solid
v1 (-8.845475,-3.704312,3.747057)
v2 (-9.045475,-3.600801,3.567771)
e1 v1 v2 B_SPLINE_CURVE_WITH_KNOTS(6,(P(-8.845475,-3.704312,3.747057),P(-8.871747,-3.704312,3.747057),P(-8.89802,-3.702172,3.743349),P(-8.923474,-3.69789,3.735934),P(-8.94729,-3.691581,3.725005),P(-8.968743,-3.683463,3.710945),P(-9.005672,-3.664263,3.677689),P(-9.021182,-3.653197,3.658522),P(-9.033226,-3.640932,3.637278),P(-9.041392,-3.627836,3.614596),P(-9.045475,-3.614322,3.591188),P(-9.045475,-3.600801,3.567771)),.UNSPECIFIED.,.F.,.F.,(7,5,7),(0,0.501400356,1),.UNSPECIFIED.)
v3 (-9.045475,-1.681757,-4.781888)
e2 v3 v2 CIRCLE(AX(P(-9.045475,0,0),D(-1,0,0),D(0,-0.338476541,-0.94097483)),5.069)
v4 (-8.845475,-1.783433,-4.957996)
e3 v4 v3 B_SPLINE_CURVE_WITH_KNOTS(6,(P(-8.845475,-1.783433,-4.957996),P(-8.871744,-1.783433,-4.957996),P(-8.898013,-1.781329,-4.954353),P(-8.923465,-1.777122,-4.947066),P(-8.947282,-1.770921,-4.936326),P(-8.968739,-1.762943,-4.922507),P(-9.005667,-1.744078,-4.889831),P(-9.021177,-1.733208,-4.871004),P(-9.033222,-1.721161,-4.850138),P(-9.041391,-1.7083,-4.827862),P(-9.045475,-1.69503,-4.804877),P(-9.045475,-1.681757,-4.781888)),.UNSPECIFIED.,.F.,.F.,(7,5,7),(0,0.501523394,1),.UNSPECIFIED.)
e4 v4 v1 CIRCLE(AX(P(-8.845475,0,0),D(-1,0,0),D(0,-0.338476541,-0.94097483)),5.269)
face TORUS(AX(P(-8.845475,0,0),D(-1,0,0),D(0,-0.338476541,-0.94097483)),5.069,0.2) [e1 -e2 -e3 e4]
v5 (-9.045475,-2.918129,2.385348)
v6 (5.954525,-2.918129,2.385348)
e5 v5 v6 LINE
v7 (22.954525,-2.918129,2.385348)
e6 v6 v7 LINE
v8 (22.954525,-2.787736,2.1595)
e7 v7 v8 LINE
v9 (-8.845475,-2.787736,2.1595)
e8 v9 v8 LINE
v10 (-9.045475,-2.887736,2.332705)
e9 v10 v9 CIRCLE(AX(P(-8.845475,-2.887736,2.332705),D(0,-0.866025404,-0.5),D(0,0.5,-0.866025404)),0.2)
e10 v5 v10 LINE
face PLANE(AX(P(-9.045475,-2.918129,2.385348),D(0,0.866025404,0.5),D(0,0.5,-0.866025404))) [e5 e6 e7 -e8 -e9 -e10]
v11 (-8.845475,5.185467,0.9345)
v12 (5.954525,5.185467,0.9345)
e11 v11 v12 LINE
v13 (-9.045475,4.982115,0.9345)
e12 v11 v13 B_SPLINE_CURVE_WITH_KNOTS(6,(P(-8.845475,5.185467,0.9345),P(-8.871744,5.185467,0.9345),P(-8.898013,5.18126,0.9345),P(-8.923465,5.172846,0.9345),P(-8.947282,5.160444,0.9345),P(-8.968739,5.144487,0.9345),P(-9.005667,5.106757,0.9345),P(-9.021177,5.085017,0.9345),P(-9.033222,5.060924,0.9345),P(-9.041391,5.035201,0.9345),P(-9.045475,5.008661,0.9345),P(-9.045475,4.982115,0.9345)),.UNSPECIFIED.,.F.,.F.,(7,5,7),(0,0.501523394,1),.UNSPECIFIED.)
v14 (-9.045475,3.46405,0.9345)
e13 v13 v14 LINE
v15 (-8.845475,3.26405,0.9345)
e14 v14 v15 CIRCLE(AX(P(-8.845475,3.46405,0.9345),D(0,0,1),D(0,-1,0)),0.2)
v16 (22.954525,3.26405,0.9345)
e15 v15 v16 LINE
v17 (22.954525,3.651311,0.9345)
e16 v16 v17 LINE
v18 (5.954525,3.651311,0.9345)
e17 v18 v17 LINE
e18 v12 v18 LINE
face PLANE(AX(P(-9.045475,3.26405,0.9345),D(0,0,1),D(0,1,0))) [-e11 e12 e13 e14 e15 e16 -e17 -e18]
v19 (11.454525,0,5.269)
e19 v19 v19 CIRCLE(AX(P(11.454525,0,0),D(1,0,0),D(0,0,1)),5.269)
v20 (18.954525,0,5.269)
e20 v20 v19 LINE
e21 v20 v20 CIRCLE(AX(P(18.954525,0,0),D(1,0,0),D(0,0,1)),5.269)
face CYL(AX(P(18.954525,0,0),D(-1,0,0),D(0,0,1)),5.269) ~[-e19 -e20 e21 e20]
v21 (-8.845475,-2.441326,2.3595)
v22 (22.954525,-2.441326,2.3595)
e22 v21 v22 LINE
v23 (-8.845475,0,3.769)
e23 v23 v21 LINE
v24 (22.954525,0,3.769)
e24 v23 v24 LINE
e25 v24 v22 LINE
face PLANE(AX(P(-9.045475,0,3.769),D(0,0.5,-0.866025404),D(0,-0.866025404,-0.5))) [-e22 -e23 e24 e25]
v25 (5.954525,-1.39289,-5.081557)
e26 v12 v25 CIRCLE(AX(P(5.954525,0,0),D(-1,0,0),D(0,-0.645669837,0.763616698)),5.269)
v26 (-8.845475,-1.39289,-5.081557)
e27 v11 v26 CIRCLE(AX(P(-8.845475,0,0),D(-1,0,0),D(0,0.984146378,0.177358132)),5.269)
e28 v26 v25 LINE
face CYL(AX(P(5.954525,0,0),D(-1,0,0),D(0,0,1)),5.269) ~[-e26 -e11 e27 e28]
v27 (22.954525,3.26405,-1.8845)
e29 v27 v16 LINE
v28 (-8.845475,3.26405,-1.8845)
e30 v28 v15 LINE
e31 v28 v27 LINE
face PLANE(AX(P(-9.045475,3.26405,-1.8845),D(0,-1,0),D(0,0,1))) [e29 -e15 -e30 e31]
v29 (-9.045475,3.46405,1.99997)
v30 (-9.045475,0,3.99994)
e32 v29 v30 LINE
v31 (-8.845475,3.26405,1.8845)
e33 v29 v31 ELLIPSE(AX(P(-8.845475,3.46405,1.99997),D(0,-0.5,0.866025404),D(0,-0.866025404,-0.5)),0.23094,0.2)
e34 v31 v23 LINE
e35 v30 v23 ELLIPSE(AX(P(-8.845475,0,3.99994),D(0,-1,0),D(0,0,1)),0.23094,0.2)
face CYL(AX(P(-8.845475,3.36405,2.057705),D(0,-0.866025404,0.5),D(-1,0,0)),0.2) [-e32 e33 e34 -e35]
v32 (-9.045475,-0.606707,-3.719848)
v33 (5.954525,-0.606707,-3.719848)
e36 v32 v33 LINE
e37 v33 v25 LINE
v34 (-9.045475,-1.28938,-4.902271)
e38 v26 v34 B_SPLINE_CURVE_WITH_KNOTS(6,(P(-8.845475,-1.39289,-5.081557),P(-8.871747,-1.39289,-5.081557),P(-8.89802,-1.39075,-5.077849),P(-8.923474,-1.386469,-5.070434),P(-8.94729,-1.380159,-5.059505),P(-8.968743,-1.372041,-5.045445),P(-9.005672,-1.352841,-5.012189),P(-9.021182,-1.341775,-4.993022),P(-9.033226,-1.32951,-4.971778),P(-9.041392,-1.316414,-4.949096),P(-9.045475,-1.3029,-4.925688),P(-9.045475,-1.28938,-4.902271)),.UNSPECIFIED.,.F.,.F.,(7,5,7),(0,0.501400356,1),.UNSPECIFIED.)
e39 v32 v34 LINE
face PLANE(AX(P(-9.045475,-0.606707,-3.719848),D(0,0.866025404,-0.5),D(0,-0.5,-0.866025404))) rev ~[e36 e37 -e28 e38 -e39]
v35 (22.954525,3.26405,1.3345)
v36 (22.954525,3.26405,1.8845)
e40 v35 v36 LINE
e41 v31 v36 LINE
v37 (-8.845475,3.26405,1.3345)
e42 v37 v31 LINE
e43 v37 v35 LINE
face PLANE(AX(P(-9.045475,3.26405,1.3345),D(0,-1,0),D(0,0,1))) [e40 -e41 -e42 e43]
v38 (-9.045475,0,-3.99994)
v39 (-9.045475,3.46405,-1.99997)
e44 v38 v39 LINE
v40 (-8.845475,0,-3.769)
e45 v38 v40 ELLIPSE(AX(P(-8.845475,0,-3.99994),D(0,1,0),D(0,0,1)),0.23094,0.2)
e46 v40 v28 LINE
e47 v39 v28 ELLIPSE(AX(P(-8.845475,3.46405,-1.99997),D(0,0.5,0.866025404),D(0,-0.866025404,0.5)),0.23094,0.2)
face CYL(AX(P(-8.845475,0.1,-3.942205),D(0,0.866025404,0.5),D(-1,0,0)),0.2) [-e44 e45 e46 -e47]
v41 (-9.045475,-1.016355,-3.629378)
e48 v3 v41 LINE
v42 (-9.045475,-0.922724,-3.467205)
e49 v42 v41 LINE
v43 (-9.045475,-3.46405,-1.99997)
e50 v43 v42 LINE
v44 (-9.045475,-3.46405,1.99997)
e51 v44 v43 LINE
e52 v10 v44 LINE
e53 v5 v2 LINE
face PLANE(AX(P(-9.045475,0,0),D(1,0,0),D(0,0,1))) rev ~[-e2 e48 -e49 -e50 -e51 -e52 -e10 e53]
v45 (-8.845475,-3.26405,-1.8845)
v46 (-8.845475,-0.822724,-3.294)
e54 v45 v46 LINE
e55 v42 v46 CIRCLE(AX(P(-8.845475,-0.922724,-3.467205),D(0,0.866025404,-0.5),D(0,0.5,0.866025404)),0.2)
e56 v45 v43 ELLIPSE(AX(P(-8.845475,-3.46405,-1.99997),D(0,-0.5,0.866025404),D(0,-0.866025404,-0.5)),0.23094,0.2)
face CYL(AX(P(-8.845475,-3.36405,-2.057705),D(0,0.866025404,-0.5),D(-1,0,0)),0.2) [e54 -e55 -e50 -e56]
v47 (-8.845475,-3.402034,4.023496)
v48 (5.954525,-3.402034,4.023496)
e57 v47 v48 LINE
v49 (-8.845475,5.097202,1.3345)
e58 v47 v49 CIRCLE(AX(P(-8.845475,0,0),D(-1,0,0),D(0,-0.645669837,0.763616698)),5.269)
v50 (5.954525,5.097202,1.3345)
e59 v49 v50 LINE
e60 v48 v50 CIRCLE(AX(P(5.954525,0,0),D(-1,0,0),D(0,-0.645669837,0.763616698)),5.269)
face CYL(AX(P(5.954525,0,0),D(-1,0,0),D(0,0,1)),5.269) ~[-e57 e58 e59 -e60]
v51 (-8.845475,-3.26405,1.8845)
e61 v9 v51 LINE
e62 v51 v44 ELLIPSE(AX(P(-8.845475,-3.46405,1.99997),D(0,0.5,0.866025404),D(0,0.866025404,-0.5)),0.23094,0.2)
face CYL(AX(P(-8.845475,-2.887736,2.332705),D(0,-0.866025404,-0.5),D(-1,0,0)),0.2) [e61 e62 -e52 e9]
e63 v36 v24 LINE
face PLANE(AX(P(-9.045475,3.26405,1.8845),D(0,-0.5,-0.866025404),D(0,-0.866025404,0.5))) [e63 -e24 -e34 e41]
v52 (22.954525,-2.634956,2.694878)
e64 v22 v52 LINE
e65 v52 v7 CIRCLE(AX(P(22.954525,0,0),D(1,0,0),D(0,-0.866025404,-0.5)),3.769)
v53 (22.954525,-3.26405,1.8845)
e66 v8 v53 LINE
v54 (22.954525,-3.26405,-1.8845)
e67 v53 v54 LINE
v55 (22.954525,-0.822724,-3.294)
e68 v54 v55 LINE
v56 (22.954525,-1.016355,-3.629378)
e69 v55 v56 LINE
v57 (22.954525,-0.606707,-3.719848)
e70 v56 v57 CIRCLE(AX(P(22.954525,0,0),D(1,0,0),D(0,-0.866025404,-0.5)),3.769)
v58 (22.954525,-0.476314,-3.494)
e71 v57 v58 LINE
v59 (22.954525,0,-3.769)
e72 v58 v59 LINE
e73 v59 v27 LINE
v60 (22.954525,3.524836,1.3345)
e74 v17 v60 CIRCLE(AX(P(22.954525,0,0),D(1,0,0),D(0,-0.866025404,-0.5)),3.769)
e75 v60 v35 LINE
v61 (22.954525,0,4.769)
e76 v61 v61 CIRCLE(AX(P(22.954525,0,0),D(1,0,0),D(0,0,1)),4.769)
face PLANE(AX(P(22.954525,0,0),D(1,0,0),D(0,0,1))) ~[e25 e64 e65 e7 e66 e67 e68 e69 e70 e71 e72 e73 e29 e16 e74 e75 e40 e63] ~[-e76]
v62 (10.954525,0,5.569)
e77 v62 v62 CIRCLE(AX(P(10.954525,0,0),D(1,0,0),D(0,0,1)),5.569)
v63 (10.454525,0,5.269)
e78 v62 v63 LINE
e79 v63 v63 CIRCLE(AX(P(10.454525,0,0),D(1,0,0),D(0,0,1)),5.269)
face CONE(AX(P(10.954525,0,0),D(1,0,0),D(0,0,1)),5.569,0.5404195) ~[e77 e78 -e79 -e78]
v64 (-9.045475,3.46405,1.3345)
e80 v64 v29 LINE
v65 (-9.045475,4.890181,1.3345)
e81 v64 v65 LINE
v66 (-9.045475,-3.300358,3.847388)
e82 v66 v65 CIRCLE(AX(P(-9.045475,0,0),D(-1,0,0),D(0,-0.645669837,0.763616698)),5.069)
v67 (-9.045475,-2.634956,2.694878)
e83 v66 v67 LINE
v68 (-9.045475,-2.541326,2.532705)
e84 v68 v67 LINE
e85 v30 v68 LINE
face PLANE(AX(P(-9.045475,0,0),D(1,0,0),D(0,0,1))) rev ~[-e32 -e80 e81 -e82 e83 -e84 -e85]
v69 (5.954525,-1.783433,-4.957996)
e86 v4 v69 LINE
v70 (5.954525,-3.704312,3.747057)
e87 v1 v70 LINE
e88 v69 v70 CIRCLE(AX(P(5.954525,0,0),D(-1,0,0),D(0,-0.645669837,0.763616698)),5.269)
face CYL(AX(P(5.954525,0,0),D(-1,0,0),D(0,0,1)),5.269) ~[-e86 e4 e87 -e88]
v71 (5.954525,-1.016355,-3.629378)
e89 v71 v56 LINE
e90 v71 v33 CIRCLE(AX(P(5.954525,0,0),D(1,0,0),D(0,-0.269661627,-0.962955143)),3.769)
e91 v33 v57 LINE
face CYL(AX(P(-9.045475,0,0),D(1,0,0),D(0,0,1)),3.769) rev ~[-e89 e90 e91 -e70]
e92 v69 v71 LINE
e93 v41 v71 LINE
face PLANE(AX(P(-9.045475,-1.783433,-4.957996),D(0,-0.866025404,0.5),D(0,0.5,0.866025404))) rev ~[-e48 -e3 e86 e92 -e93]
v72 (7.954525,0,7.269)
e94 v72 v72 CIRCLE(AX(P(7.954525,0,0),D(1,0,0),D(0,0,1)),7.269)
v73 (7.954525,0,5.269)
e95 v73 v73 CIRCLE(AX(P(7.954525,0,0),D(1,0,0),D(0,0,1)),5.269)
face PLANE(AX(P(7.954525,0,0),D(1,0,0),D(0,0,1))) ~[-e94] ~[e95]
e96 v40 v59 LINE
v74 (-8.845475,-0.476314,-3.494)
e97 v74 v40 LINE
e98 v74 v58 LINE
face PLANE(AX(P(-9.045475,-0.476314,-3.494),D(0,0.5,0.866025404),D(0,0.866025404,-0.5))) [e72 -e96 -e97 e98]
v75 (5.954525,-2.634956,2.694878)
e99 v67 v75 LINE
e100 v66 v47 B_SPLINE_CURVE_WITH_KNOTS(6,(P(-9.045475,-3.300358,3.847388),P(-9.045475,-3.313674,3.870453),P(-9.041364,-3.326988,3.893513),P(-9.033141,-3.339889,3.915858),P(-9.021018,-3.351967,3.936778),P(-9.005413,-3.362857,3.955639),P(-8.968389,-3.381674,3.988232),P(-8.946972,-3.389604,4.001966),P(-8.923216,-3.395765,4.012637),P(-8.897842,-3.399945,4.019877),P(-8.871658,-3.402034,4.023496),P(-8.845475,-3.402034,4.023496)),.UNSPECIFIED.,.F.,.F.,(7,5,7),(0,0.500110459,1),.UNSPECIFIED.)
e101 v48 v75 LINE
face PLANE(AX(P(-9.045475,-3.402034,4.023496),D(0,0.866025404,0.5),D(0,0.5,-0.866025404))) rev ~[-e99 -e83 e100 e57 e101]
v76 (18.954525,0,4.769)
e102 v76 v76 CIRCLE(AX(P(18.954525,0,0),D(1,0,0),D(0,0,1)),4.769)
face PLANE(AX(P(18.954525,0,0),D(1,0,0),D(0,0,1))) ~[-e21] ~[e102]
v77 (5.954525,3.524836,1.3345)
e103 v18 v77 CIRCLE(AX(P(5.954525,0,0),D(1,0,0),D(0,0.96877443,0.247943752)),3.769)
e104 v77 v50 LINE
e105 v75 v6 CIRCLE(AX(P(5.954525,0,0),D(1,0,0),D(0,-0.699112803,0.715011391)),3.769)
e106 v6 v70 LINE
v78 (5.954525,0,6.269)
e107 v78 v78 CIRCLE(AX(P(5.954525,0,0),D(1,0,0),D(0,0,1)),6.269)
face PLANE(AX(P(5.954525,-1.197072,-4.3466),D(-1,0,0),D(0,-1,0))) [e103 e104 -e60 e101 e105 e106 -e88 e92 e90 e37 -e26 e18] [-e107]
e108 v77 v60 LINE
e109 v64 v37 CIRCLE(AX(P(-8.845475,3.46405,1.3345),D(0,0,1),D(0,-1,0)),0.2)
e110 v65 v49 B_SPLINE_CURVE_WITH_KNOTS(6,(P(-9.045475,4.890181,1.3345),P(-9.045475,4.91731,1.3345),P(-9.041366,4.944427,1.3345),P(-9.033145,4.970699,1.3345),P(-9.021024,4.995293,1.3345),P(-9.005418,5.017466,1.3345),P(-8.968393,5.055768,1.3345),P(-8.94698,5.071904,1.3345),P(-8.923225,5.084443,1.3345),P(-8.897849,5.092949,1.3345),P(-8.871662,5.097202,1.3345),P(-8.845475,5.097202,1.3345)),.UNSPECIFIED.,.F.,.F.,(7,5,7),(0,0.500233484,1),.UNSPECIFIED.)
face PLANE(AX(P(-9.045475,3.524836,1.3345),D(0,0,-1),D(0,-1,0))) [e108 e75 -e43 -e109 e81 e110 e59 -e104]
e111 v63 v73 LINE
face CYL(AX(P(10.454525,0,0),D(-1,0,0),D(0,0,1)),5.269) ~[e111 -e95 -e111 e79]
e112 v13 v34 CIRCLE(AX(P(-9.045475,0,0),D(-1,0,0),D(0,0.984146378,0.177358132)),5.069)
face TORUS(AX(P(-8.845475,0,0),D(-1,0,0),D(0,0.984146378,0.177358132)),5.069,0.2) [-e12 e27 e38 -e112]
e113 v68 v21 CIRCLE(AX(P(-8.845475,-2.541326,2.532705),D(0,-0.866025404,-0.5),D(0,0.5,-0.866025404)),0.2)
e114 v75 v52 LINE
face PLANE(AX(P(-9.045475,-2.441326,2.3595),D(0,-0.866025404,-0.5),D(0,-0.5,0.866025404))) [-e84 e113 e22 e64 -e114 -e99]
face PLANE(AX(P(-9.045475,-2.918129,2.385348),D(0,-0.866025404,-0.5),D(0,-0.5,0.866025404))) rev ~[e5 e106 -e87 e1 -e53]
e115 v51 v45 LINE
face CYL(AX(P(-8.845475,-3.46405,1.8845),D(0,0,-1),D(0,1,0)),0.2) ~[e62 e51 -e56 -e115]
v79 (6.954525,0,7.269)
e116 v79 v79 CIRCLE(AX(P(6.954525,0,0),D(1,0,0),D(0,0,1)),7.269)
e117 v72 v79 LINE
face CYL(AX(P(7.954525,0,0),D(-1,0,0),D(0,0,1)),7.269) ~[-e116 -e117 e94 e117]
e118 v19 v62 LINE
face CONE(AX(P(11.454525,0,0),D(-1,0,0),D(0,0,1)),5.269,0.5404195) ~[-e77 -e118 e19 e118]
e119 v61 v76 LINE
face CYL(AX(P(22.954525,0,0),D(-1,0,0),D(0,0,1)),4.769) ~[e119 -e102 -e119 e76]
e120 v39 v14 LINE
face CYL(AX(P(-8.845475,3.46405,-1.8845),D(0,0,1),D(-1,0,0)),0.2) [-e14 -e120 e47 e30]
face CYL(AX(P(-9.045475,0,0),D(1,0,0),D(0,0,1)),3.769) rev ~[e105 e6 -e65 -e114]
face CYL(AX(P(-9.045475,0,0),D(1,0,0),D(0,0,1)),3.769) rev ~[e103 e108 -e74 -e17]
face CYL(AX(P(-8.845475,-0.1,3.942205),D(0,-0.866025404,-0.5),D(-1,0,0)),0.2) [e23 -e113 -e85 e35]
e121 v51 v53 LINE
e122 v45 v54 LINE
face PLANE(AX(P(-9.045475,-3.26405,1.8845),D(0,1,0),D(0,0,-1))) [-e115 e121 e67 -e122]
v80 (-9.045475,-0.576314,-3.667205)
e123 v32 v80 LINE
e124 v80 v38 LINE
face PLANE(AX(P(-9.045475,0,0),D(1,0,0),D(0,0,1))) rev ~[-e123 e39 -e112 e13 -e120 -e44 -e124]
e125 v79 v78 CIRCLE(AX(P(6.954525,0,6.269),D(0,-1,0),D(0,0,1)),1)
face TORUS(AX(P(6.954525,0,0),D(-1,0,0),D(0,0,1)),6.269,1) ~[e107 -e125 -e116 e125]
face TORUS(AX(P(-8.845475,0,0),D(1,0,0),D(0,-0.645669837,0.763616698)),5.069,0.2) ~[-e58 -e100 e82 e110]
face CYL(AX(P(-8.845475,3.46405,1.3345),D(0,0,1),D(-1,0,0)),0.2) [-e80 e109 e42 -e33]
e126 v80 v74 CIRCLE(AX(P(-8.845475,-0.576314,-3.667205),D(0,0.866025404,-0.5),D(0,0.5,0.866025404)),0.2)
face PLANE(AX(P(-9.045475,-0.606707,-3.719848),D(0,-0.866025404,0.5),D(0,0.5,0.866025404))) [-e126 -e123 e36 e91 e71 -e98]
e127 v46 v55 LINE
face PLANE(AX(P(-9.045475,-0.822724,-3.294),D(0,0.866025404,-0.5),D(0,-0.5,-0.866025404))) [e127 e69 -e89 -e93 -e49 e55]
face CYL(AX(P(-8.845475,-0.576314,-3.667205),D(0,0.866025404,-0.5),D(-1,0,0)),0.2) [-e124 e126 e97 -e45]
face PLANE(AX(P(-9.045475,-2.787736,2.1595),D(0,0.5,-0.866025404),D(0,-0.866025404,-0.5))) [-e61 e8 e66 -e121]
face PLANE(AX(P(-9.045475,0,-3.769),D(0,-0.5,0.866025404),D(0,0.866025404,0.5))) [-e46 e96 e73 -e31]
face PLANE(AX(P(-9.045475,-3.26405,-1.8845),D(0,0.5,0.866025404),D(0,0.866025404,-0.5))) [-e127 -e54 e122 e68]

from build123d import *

# Parameters (mm, degrees)
F2_R     = 1
F4_DEPTH = 32
F5_DEPTH = 32
F6_DEPTH = 15
F7_DEPTH = 15
F8_DEPTH = 15
F9_R     = 0.2


with BuildPart() as f1:
    # F0 (on Front) → F1 (revolve)
    with BuildSketch(Plane.XZ):
        Polygon((-9.0454753935, 5.269), (-9.0454753935, 3.769), (22.9545246065, 3.769), (22.9545246065, 4.769), (18.9545246065, 4.769), (18.9545246065, 5.269), (11.4545246065, 5.269), (10.9545246065, 5.569), (10.4545246065, 5.269), (7.9545246065, 5.269), (7.9545246065, 7.269), (5.9545246065, 7.269), (5.9545246065, 5.269), align=None)
    revolve(axis=Axis((2.1683473801, 0, 0), (1, 0, 0)))

    # F2
    f2_edges = [f1.edges().sort_by_distance(p)[0] for p in [
        (5.954525, 0, -7.269),
    ]]
    fillet(f2_edges, radius=F2_R)

    # F3 (on face) → F4 (join)
    with BuildSketch(Plane(origin=(-9.0454753935, 0, 0), x_dir=(0, -1, 0), z_dir=(-1, 0, 0))):
        with BuildLine():
            ThreePointArc((3.769, 0), (3.6405744393, 0.975488981), (3.2640497469, 1.8845))
            Line((3.2640497469, 1.8845), (3.2640497469, -1.8845))
            ThreePointArc((3.2640497469, -1.8845), (3.6405744393, -0.975488981), (3.769, 0))
        make_face()
    extrude(amount=-F4_DEPTH)

    # F3 (on face) → F5 (join)
    with BuildSketch(Plane(origin=(-9.0454753935, 0, 0), x_dir=(0, -1, 0), z_dir=(-1, 0, 0))):
        with BuildLine():
            ThreePointArc((3.769, 0), (3.6405744393, 0.975488981), (3.2640497469, 1.8845))
            Line((3.2640497469, 1.8845), (3.2640497469, -1.8845))
            ThreePointArc((3.2640497469, -1.8845), (3.6405744393, -0.975488981), (3.769, 0))
        make_face()
        with BuildLine():
            Line((2.7877357748, 2.1595), (3.2640497469, 1.8845))
            ThreePointArc((3.2640497469, 1.8845), (3.1012168176, 2.1419185909), (2.9181290377, 2.3853477564))
            Line((2.9181290377, 2.3853477564), (2.7877357748, 2.1595))
        make_face()
        with BuildLine():
            ThreePointArc((1.0163546733, -3.6293779327), (2.3111934688, -2.9772043514), (3.2640497469, -1.8845))
            Line((3.2640497469, -1.8845), (0.8227241336, -3.294))
            Line((0.8227241336, -3.294), (1.0163546733, -3.6293779327))
        make_face()
        with BuildLine():
            Line((0, 3.769), (2.4413256133, 2.3595))
            Line((2.4413256133, 2.3595), (2.634956153, 2.6948779327))
            ThreePointArc((2.634956153, 2.6948779327), (1.4227378662, 3.4901544327), (0, 3.769))
        make_face()
        with BuildLine():
            Line((0.606707235, -3.7198477564), (0.4763139721, -3.494))
            Line((0.4763139721, -3.494), (0, -3.769))
            ThreePointArc((0, -3.769), (0.3043475037, -3.7566918422), (0.606707235, -3.7198477564))
        make_face()
        with BuildLine():
            Line((-3.2640497469, 1.8845), (0, 3.769))
            ThreePointArc((0, 3.769), (-1.8845, 3.2640497469), (-3.2640497469, 1.8845))
        make_face()
        with BuildLine():
            ThreePointArc((-3.2640497469, -1.8845), (-1.8845, -3.2640497469), (0, -3.769))
            Line((0, -3.769), (-3.2640497469, -1.8845))
        make_face()
        with BuildLine():
            Line((-3.2640497469, 1.3345), (-3.2640497469, 1.8845))
            ThreePointArc((-3.2640497469, 1.8845), (-3.4055643214, 1.6147732513), (-3.5248362728, 1.3345))
            Line((-3.5248362728, 1.3345), (-3.2640497469, 1.3345))
        make_face()
        with BuildLine():
            ThreePointArc((-3.6513108263, 0.9345), (-3.7339313349, -0.5129500813), (-3.2640497469, -1.8845))
            Line((-3.2640497469, -1.8845), (-3.2640497469, 0.9345))
            Line((-3.2640497469, 0.9345), (-3.6513108263, 0.9345))
        make_face()
    extrude(amount=-F5_DEPTH)

    # F3 (on face) → F6 (cut)
    with BuildSketch(Plane(origin=(-9.0454753935, 0, 0), x_dir=(0, -1, 0), z_dir=(-1, 0, 0))):
        with BuildLine():
            ThreePointArc((2.634956153, 2.6948779327), (2.78085257, 2.5440558138), (2.9181290377, 2.3853477564))
            Line((2.9181290377, 2.3853477564), (3.704312025, 3.7470566344))
            ThreePointArc((3.704312025, 3.7470566344), (3.5558605867, 3.8882150774), (3.402034372, 4.0234963814))
            Line((3.402034372, 4.0234963814), (2.634956153, 2.6948779327))
        make_face()
    extrude(amount=-F6_DEPTH, mode=Mode.SUBTRACT)

    # F3 (on face) → F7 (cut)
    with BuildSketch(Plane(origin=(-9.0454753935, 0, 0), x_dir=(0, -1, 0), z_dir=(-1, 0, 0))):
        with BuildLine():
            Line((1.7834328924, -4.9579963814), (1.0163546733, -3.6293779327))
            ThreePointArc((1.0163546733, -3.6293779327), (0.8127906784, -3.6803168767), (0.606707235, -3.7198477564))
            Line((0.606707235, -3.7198477564), (1.3928902223, -5.0815566344))
            ThreePointArc((1.3928902223, -5.0815566344), (1.589362739, -5.0235731391), (1.7834328924, -4.9579963814))
        make_face()
    extrude(amount=-F7_DEPTH, mode=Mode.SUBTRACT)

    # F3 (on face) → F8 (cut)
    with BuildSketch(Plane(origin=(-9.0454753935, 0, 0), x_dir=(0, -1, 0), z_dir=(-1, 0, 0))):
        with BuildLine():
            Line((-3.5248362728, 1.3345), (-5.0972022473, 1.3345))
            ThreePointArc((-5.0972022473, 1.3345), (-5.1452233257, 1.1353580617), (-5.1854672644, 0.9345))
            Line((-5.1854672644, 0.9345), (-3.6513108263, 0.9345))
            ThreePointArc((-3.6513108263, 0.9345), (-3.5936432484, 1.1362610629), (-3.5248362728, 1.3345))
        make_face()
    extrude(amount=-F8_DEPTH, mode=Mode.SUBTRACT)

    # F9
    f9_edges = [f1.edges().sort_by_distance(p)[0] for p in [
        (-9.045475, 1.589363, 5.023573),
        (-9.045475, -5.145223, -1.135358),
        (-9.045475, 3.555861, -3.888215),
        (-9.045475, 3.26405, -0.475),
        (-9.045475, 1.632025, -2.82675),
        (-9.045475, -0.238157, -3.6315),
        (-9.045475, -3.26405, 0),
        (-9.045475, -3.025893, 2.022),
        (-9.045475, 1.632025, 2.82675),
        (-9.045475, -1.220663, 3.06425),
        (-9.045475, -2.043387, -2.58925),
        (-9.045475, 3.26405, 1.6095),
    ]]
    fillet(f9_edges, radius=F9_R)


solid = f1.part
